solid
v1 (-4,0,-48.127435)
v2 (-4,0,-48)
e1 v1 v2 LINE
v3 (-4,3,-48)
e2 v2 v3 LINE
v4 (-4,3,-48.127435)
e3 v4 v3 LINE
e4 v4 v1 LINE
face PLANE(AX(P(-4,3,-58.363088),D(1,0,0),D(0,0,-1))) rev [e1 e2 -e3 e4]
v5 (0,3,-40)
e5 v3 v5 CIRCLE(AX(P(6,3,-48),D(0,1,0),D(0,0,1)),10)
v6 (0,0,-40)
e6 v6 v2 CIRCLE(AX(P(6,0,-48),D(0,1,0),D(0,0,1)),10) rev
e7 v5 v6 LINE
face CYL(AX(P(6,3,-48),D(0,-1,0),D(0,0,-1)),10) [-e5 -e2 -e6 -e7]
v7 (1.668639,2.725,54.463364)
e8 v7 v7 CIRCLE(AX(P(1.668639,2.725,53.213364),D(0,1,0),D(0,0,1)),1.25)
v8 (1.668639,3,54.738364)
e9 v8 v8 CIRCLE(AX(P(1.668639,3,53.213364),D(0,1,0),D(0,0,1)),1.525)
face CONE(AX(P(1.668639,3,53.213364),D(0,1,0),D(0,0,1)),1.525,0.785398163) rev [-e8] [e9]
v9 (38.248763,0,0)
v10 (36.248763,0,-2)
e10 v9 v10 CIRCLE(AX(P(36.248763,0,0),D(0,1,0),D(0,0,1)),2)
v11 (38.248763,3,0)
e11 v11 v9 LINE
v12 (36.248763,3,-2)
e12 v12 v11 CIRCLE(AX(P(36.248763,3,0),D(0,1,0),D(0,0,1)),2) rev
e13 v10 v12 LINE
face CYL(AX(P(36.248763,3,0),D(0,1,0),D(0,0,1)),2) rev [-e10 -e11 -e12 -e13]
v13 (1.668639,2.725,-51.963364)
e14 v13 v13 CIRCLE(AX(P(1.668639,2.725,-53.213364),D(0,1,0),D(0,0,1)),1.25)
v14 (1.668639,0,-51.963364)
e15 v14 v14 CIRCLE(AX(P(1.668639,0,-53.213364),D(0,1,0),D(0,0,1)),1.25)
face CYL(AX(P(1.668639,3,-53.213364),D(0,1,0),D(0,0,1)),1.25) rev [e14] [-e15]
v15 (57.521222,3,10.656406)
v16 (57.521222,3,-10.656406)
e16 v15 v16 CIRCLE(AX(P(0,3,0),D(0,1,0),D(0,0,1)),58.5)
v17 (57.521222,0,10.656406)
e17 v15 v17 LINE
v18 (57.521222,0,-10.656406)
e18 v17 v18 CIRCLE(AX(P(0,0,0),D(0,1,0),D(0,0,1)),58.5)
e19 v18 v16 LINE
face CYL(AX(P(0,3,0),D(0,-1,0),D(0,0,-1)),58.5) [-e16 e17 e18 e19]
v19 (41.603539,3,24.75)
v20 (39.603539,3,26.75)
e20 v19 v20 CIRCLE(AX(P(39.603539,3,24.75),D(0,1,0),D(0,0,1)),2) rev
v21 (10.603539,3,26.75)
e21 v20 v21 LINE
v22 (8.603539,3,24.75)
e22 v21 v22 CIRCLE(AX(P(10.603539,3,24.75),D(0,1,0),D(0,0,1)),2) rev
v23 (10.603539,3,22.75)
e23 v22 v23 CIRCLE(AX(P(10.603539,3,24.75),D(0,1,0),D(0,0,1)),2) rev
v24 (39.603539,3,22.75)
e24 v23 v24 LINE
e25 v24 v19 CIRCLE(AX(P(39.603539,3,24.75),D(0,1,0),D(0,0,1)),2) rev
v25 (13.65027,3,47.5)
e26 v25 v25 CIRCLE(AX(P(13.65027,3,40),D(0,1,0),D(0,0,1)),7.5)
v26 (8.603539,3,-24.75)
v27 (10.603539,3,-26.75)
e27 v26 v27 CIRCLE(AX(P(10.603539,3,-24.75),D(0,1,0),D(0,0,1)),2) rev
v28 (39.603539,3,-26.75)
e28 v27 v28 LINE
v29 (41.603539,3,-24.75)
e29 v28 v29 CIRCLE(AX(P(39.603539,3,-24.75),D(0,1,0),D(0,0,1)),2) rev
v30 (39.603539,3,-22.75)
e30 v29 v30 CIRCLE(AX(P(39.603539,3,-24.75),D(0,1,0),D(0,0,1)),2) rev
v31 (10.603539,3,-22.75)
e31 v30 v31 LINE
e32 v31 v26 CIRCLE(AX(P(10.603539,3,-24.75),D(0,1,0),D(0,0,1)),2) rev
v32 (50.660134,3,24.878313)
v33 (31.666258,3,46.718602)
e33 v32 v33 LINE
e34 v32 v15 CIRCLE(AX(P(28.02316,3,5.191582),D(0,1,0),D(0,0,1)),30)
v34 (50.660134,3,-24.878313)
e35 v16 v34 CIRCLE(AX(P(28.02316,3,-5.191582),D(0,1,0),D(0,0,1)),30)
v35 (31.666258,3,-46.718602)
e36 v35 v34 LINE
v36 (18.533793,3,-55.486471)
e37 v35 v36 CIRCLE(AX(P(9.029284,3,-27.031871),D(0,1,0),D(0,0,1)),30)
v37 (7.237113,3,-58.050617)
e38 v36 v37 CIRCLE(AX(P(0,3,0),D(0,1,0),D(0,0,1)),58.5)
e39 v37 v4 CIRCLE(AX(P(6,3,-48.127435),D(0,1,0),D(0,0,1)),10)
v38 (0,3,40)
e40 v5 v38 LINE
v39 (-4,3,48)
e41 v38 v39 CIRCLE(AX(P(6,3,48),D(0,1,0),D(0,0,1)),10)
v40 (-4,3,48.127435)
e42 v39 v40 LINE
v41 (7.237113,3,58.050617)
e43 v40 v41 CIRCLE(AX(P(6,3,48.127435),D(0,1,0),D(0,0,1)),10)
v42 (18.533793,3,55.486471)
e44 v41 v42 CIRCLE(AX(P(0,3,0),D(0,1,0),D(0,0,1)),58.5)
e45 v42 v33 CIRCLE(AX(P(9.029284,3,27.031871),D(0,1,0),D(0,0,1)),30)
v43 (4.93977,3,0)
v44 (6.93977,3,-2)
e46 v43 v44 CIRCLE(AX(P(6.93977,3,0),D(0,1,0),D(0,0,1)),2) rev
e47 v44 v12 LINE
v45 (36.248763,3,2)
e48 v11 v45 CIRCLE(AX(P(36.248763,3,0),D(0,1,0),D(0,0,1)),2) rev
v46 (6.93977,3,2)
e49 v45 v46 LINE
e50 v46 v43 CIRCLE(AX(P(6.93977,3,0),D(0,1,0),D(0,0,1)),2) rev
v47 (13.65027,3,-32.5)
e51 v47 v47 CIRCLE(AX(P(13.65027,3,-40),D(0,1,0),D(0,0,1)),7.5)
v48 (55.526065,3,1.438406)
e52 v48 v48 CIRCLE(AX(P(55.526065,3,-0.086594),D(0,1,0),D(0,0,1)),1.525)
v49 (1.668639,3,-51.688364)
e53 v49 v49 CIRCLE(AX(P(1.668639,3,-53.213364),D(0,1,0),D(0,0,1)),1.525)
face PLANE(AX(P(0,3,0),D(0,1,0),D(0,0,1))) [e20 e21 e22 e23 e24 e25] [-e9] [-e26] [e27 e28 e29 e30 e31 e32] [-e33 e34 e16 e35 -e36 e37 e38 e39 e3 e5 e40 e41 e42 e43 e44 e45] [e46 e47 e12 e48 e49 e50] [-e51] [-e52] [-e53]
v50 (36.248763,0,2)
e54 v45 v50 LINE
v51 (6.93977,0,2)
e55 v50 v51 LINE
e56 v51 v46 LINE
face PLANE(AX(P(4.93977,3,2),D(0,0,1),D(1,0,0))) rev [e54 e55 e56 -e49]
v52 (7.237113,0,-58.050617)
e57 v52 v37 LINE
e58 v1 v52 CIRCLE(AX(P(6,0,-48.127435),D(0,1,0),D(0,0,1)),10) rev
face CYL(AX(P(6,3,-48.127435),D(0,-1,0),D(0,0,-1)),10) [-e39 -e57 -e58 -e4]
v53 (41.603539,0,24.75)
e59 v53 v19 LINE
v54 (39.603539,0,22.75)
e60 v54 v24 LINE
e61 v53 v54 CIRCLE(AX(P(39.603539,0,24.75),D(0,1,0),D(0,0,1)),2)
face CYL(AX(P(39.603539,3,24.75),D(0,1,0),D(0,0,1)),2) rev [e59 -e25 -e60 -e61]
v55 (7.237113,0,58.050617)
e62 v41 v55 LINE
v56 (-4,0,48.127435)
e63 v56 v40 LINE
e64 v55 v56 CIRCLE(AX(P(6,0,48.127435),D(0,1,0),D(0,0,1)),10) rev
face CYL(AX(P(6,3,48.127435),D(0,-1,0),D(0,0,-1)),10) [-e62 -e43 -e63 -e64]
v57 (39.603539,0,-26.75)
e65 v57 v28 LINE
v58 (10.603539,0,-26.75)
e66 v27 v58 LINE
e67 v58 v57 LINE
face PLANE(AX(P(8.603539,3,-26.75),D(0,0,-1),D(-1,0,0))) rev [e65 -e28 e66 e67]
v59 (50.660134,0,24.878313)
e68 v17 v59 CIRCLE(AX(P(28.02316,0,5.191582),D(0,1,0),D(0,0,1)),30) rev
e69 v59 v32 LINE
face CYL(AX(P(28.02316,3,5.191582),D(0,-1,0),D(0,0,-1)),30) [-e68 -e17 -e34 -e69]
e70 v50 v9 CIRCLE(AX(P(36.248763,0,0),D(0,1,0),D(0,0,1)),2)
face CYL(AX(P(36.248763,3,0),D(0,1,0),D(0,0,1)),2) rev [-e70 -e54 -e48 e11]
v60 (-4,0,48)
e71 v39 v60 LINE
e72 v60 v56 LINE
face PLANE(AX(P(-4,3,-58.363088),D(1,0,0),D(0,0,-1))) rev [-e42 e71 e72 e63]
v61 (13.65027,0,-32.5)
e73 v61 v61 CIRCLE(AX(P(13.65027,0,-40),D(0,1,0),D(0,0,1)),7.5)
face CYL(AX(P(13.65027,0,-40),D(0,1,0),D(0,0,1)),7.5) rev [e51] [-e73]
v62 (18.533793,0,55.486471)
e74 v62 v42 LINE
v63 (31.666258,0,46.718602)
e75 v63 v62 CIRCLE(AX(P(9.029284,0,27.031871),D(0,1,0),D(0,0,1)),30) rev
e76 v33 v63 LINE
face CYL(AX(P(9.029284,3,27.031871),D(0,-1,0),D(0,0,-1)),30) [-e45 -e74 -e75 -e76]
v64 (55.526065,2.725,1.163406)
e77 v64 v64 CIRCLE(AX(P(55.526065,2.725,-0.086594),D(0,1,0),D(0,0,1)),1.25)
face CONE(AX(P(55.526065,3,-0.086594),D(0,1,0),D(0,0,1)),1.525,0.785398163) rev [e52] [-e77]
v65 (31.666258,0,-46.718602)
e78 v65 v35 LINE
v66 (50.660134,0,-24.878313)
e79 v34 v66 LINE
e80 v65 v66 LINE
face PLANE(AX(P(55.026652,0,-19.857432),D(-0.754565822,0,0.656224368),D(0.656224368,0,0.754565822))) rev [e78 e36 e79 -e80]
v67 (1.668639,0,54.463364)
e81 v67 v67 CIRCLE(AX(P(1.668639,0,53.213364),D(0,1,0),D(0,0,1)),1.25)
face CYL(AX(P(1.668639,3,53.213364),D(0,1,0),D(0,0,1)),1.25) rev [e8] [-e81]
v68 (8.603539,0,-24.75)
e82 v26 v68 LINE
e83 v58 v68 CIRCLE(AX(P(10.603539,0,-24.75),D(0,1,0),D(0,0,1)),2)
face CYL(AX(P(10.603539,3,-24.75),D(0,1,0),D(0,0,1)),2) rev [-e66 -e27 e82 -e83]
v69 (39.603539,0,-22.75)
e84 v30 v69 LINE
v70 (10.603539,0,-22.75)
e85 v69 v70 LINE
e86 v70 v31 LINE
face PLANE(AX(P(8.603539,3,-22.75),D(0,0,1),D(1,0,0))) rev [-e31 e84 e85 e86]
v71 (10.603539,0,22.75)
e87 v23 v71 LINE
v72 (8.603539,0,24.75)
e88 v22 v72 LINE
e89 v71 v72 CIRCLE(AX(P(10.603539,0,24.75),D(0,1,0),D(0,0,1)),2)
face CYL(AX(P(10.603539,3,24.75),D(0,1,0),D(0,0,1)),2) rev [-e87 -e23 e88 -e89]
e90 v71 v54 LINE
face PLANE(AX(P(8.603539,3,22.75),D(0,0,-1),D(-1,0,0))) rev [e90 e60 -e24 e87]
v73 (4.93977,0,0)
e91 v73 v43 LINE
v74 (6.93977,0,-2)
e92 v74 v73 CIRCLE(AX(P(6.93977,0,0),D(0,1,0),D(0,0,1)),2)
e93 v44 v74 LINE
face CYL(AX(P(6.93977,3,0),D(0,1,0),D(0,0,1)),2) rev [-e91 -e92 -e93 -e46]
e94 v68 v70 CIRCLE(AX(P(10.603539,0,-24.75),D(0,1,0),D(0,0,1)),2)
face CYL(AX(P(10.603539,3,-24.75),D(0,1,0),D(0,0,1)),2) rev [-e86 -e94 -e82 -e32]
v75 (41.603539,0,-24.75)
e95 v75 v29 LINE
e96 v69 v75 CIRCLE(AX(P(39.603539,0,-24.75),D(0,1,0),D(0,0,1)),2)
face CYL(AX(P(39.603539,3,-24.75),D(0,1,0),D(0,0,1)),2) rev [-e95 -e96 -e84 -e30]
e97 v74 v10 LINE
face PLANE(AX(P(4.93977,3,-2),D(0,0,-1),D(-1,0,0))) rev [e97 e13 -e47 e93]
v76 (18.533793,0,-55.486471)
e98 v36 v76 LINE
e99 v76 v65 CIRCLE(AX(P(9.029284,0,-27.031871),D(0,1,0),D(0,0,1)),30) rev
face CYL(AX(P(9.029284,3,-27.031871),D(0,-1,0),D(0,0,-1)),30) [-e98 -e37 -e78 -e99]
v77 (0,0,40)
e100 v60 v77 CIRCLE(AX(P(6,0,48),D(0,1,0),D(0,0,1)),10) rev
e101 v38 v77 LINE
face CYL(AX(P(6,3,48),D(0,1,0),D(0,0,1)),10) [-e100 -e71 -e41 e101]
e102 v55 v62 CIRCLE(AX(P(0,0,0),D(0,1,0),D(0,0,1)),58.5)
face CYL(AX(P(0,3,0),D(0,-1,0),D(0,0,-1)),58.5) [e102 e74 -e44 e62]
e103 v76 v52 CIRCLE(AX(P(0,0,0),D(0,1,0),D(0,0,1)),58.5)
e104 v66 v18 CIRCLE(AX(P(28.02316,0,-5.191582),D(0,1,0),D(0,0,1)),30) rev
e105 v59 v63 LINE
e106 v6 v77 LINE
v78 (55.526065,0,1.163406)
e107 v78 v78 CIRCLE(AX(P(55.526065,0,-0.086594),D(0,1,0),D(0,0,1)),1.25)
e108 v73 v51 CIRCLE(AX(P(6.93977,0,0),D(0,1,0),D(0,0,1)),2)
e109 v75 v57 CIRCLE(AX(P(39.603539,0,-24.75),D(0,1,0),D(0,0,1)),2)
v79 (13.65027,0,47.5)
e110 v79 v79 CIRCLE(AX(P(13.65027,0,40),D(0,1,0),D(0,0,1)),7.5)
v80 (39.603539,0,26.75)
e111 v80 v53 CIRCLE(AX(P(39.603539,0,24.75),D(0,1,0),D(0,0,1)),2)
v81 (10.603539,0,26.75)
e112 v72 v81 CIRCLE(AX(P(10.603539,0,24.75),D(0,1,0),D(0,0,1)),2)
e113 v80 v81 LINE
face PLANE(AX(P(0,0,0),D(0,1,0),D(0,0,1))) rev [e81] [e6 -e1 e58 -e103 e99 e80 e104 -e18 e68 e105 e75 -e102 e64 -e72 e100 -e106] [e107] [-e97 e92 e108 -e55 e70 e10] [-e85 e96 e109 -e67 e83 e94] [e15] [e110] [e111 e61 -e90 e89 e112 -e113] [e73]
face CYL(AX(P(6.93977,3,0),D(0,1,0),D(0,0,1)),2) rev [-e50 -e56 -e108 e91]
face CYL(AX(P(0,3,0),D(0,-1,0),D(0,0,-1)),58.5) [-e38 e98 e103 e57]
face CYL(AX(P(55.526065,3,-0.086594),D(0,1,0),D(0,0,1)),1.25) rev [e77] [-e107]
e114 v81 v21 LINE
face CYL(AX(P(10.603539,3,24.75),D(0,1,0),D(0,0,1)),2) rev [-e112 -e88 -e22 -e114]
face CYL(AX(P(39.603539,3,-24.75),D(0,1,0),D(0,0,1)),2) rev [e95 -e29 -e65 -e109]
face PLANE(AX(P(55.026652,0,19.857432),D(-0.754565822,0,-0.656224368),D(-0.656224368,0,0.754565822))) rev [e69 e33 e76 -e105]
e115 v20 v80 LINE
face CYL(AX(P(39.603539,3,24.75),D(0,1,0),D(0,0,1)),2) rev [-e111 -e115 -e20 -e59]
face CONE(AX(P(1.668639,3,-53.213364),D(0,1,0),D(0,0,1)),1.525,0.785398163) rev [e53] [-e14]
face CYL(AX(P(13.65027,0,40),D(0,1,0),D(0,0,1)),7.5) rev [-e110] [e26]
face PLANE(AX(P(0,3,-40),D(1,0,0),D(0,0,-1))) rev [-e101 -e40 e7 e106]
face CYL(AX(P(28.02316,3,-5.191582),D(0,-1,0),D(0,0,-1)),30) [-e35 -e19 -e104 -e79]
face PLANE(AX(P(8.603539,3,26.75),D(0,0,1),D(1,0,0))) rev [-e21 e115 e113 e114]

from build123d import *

# Parameters (mm, degrees)
EXTRUDE_1_DEPTH              = 3
FILLET_1_R                   = 10
SKETCH_2_W                   = 33
SKETCH_2_H                   = 4
SKETCH_2_W_2                 = 33.308993126
CUT_EXTRUDE_1_DEPTH          = 83.523019213
SKETCH_3_W                   = 8
SKETCH_3_H                   = 80
CUT_EXTRUDE_2_DEPTH          = 83.523019213
FILLET_2_R                   = 10
FILLET_3_R                   = 2
CUT_EXTRUDE_3_DEPTH          = 83.523019213
FILLET_4_R                   = 30
SKETCH_5_R                   = 7.5
CUT_EXTRUDE_4_DEPTH          = 83.523019213
HOLE_WIZARD_M3_1_D           = 2.5
HOLE_WIZARD_M3_1_DEPTH       = 3
HOLE_WIZARD_M3_1_CSINK_D     = 3.05
HOLE_WIZARD_M3_1_CSINK_ANGLE = 90
HOLE_WIZARD_M3_1_TIP         = 0.751075774


# Some blends are built 0.0001 mm under size
with BuildPart() as part:
    # 草图1 → 凸台-拉伸1 (new body)
    with BuildSketch(Plane(origin=(0, 0, 0), x_dir=(1, 0, 0), z_dir=(0, 1, 0))):
        with BuildLine():
            Line((-4, 58.36308765), (-4, -58.36308765))
            ThreePointArc((-4, -58.36308765), (58.5, 0), (-4, 58.36308765))
        make_face()
    extrude(amount=EXTRUDE_1_DEPTH)

    # 圆角1
    fillet_1_edges = [part.edges().sort_by_distance(p)[0] for p in [
        (-4, 1.5, 58.36308765),
        (-4, 1.5, -58.36308765),
    ]]
    fillet(fillet_1_edges, radius=FILLET_1_R)

    # 草图2 → 切除-拉伸1 (cut, through all)
    with BuildSketch(Plane.XZ):
        with Locations((25.103538951, 24.75)):
            Rectangle(SKETCH_2_W, SKETCH_2_H)
        with Locations((25.103538951, -24.75)):
            Rectangle(SKETCH_2_W, SKETCH_2_H)
        with Locations((21.59426648, 0)):
            Rectangle(SKETCH_2_W_2, SKETCH_2_H)
    extrude(amount=-CUT_EXTRUDE_1_DEPTH, mode=Mode.SUBTRACT)

    # 草图3 → 切除-拉伸2 (cut, through all)
    with BuildSketch(Plane.XZ):
        with Locations((-4, 0)):
            Rectangle(SKETCH_3_W, SKETCH_3_H)
    extrude(amount=-CUT_EXTRUDE_2_DEPTH, mode=Mode.SUBTRACT)

    # 圆角2
    # the kernel refuses this fillet: 10 mm, written as the material it takes off along each edge
    with BuildSketch(Plane(origin=(-4, 23, 40), x_dir=(0, 0, 1), z_dir=(0, -1, 0)), Plane(origin=(-4, -20, -40), x_dir=(0, 0, -1), z_dir=(0, 1, 0))) as fillet_2_piece_1:
        with BuildLine():
            CenterArc((8, -10), FILLET_2_R, 90, 53.130102354)
            Line((0, -4), (-0.16, -3.88))
            ThreePointArc((-0.16, -3.88), (-0.2, -2), (-0.2, 0))
            Line((-0.2, 0), (0, 0.2))
            Line((0, 0.2), (8, 0.2))
            Line((8, 0.2), (8, 0))
        make_face()
    extrude(amount=43, mode=Mode.SUBTRACT)

    # 圆角3
    fillet_3_edges = [part.edges().sort_by_distance(p)[0] for p in [
        (8.603538951, 1.5, -26.75),
        (8.603538951, 1.5, -22.75),
        (41.603538951, 1.5, -26.75),
        (41.603538951, 1.5, -22.75),
        (4.939769917, 1.5, 2),
        (38.248763043, 1.5, 2),
        (38.248763043, 1.5, -2),
        (4.939769917, 1.5, -2),
        (41.603538951, 1.5, 22.75),
        (41.603538951, 1.5, 26.75),
        (8.603538951, 1.5, 22.75),
        (8.603538951, 1.5, 26.75),
    ]]
    fillet(fillet_3_edges, radius=FILLET_3_R - 0.0001)  # a hair under: the kernel refuses the full size

    # 草图4 → 切除-拉伸3 (cut, through all)
    with BuildSketch(Plane(origin=(0, 3, 0), x_dir=(1, 0, 0), z_dir=(0, 1, 0))):
        with BuildLine():
            Line((55.026651821, -19.857431591), (27.299740921, -51.73948343))
            ThreePointArc((27.299740921, -51.73948343), (44.142100571, -38.389125506), (55.026651821, -19.857431591))
        make_face()
        with BuildLine():
            Line((55.026651821, 19.857431591), (27.299740921, 51.73948343))
            ThreePointArc((27.299740921, 51.73948343), (44.142100571, 38.389125506), (55.026651821, 19.857431591))
        make_face()
    extrude(amount=-CUT_EXTRUDE_3_DEPTH, mode=Mode.SUBTRACT)

    # 圆角4
    fillet_4_edges = [part.edges().sort_by_distance(p)[0] for p in [
        (55.026651821, 1.5, 19.857431591),
        (27.299740921, 1.5, 51.73948343),
        (27.299740921, 1.5, -51.73948343),
        (55.026651821, 1.5, -19.857431591),
    ]]
    fillet(fillet_4_edges, radius=FILLET_4_R)

    # 草图5 → 切除-拉伸4 (cut, through all)
    with BuildSketch(Plane(origin=(0, 3, 0), x_dir=(1, 0, 0), z_dir=(0, 1, 0))):
        with Locations(Location((13.650269614, 40, 0), (0, 0, 270))):
            Circle(SKETCH_5_R)
        with Locations(Location((13.650269614, -40, 0), (0, 0, 270))):
            Circle(SKETCH_5_R)
    extrude(amount=-CUT_EXTRUDE_4_DEPTH, mode=Mode.SUBTRACT)

    # M3 螺纹孔1
    with Locations(Plane(origin=(0, 3, 0), x_dir=(1, 0, 0), z_dir=(0, 1, 0))):
        with Locations((1.668639438, 53.213363577), (1.668639438, -53.213363577), (0.79229906, -68.463573452), (55.526064592, 0.086594156)):
            CounterSinkHole(HOLE_WIZARD_M3_1_D / 2, HOLE_WIZARD_M3_1_CSINK_D / 2, depth=HOLE_WIZARD_M3_1_DEPTH, counter_sink_angle=HOLE_WIZARD_M3_1_CSINK_ANGLE)
            with Locations((0, 0, -(HOLE_WIZARD_M3_1_DEPTH + HOLE_WIZARD_M3_1_TIP / 2))):  # 118° drill point
                Cone(0, HOLE_WIZARD_M3_1_D / 2, HOLE_WIZARD_M3_1_TIP, mode=Mode.SUBTRACT)


solid = part.part
